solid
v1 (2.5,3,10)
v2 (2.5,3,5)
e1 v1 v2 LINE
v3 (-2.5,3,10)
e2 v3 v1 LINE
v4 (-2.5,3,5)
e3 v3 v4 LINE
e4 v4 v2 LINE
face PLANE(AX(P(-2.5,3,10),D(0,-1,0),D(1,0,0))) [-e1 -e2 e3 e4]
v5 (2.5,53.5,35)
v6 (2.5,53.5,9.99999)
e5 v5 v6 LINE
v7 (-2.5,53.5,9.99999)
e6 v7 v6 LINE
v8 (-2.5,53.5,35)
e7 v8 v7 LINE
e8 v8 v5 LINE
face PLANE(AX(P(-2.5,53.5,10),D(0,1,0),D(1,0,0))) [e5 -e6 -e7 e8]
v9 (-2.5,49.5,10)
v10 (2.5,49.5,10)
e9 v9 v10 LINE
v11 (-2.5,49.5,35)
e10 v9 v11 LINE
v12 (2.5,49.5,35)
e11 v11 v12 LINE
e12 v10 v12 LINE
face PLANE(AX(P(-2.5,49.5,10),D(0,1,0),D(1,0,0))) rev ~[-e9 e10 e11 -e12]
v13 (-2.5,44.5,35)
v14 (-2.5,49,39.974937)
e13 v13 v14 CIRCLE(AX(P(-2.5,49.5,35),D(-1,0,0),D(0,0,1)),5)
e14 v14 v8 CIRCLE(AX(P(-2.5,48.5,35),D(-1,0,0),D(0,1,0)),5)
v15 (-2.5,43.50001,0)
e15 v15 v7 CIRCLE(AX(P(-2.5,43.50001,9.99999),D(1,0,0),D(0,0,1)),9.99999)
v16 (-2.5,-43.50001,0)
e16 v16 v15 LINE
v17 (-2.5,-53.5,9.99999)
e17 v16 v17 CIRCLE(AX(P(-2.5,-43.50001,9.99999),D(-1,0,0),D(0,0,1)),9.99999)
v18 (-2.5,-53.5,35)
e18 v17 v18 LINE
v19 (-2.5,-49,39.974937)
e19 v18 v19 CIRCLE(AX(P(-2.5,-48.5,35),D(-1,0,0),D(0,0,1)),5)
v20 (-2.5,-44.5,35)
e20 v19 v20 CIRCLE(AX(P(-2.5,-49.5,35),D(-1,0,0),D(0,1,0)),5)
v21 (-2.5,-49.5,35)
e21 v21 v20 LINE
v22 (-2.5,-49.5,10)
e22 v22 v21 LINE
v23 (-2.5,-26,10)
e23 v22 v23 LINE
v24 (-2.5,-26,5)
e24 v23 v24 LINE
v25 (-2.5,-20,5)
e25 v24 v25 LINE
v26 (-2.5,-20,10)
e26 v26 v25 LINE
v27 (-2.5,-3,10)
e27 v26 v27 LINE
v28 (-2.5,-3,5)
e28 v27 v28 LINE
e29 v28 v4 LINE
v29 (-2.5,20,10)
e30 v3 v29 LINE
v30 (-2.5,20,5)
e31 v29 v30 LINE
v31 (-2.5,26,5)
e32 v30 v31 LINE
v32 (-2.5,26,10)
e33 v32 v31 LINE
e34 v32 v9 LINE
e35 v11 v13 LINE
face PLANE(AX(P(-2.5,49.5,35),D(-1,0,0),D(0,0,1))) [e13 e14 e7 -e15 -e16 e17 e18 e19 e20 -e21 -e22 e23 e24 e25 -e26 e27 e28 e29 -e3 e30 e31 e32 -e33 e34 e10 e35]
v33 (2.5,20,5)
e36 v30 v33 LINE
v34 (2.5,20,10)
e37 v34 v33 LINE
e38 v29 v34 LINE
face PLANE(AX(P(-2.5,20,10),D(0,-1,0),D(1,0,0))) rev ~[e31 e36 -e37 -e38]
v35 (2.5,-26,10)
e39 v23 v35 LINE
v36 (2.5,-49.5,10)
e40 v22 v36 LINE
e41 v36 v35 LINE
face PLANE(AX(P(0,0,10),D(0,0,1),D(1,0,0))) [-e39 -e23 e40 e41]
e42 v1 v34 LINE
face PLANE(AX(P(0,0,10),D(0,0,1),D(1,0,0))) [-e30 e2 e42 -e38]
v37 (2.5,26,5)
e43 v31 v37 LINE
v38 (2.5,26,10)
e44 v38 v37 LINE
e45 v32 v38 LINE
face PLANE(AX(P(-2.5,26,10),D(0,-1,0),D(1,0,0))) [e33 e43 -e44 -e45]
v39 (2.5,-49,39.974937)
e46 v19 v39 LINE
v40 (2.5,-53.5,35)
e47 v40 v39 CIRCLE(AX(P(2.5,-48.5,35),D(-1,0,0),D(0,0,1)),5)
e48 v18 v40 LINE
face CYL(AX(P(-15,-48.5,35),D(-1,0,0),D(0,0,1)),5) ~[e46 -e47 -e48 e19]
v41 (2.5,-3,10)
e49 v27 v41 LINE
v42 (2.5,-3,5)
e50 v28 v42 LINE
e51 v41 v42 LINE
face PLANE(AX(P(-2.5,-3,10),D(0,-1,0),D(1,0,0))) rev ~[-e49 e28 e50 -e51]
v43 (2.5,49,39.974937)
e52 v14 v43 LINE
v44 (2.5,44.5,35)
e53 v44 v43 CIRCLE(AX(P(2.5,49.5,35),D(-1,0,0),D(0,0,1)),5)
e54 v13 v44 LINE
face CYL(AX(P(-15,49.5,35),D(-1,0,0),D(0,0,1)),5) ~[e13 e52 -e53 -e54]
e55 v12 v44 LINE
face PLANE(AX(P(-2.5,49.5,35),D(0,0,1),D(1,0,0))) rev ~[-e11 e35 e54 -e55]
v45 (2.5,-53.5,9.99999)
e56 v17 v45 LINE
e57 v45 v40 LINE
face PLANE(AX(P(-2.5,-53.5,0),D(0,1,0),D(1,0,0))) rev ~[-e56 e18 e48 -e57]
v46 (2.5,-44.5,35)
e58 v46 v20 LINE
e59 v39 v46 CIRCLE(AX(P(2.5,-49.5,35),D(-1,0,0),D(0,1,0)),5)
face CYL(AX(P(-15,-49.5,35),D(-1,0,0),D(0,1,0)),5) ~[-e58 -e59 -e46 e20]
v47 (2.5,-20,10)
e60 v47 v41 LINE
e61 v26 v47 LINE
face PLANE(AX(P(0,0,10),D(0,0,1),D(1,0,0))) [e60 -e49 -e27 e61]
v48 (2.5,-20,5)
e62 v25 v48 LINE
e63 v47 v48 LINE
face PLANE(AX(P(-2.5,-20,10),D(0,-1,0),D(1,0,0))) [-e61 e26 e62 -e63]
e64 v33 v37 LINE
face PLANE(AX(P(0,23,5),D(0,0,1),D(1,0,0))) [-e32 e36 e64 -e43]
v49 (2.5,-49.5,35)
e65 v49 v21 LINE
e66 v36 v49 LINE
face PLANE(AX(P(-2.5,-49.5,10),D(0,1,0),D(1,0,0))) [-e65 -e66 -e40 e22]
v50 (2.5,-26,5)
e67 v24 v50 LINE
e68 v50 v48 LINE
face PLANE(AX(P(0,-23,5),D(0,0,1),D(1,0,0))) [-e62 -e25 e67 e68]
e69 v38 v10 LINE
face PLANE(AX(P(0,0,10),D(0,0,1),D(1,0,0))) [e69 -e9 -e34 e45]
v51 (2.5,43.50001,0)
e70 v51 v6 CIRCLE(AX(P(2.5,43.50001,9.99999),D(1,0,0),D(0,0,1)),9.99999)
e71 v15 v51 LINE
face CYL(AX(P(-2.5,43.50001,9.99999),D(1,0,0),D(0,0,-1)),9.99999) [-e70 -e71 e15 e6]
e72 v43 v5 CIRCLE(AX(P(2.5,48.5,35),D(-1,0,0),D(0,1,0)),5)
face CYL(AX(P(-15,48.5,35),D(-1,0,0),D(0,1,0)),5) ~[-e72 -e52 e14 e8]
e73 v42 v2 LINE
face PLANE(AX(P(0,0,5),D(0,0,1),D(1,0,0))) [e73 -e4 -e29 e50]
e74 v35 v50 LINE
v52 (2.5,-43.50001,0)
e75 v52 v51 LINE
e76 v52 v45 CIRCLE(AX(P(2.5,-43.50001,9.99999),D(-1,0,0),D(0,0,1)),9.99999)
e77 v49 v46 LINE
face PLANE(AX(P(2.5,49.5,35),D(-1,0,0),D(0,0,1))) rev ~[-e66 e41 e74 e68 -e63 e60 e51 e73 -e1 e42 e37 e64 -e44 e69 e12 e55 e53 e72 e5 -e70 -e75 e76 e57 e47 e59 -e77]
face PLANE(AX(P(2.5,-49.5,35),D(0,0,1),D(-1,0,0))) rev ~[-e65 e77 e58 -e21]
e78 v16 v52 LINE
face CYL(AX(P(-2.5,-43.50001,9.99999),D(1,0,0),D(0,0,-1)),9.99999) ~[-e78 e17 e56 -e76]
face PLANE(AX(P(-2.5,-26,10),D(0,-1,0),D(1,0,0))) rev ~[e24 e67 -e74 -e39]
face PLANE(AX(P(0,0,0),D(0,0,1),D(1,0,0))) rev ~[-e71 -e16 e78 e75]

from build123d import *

# Parameters (mm, degrees)
F0_W         = 5
F0_H         = 107
F1_DEPTH     = 10
F3_W         = 5
F3_H         = 6
F4_DEPTH     = 5
F5_DEPTH     = 5
F6_R         = 9.99999
F2_W         = 5
F2_H         = 4
F7_DEPTH     = 30
F8_DEPTH     = 30
F9_W         = 5
F9_H         = 5
F10_DEPTH    = 5
F11_W        = 5
F11_H        = 5
F12_DEPTH    = 5
F13_T1_DEPTH = 30
F14_W        = 5
F14_H        = 6
F15_DEPTH    = 5


# Not quite as in the source:
# - a fillet or chamfer that OpenCascade refuses, or shapes differently, is made with other operations: its cross-section is extruded or revolved along the edge and cut away or added
# - a fillet or chamfer is up to 0.001 mm smaller than in the source, because OpenCascade refuses the exact size
# - a feature names something its author has since deleted; it is built from what else it names


with BuildPart() as f1:
    # F0 (on Top) → F1 (new body)
    with BuildSketch(Plane.XY):
        Rectangle(F0_W, F0_H)
    extrude(amount=F1_DEPTH)

    # F3 (on face) → F4 (cut)
    with BuildSketch(Plane.XY.offset(10)):
        with Locations((0, 23)):
            Rectangle(F3_W, F3_H)
    extrude(amount=-F4_DEPTH, mode=Mode.SUBTRACT)

    # F3 (on face) → F5 (cut)
    with BuildSketch(Plane.XY.offset(10)):
        with Locations((0, 23)):
            Rectangle(F3_W, F3_H)
        with Locations((0, -23)):
            Rectangle(F3_W, F3_H)
    extrude(amount=-F5_DEPTH, mode=Mode.SUBTRACT)

    # F6 (radius 10 in the source; OpenCascade refuses exactly that, so slightly less here)
    f6_edges = [f1.edges().sort_by_distance(p)[0] for p in [
        (0, -53.5, 0),
        (0, 53.5, 0),
    ]]
    fillet(f6_edges, radius=F6_R)

    # F2 (on face) → F7 (join)
    with BuildSketch(Plane.XY.offset(10)):
        with Locations((0, 51.5)):
            Rectangle(F2_W, F2_H)
    extrude(amount=F7_DEPTH)

    # F2 (on face) → F8 (join)
    with BuildSketch(Plane.XY.offset(10)):
        with Locations((0, 51.5)):
            Rectangle(F2_W, F2_H)
        with Locations((0, -51.5)):
            Rectangle(F2_W, F2_H)
    extrude(amount=F8_DEPTH)

    # F9 (on face) → F10 (join)
    with BuildSketch(Plane(origin=(0, -49.5, 0), x_dir=(-1, 0, 0), z_dir=(0, 1, 0))):
        with Locations((0, 37.5)):
            Rectangle(F9_W, F9_H)
    extrude(amount=F10_DEPTH)

    # F11 (on face) → F12 (join)
    with BuildSketch(Plane.XZ.offset(-49.5)):
        with Locations((0, 37.5)):
            Rectangle(F11_W, F11_H)
    extrude(amount=F12_DEPTH)

    # F13: fillet of radius 5 on 4 edges, made by hand

    # F13_s2 → F13_t1 (cut)
    with BuildSketch(Plane.YZ.offset(-15)):
        with BuildLine():
            ThreePointArc((-48.5, 40), (-52.0355339059, 38.5355339059), (-53.5, 35))
            Line((-53.5, 35), (-53.5, 40))
            Line((-53.5, 40), (-48.5, 40))
        make_face()
        with BuildLine():
            ThreePointArc((53.5, 35), (52.0355339059, 38.5355339059), (48.5, 40))
            Line((48.5, 40), (53.5, 40))
            Line((53.5, 40), (53.5, 35))
        make_face()
        with BuildLine():
            ThreePointArc((49.5, 40), (45.9644660941, 38.5355339059), (44.5, 35))
            Line((44.5, 35), (44.5, 40))
            Line((44.5, 40), (49.5, 40))
        make_face()
        with BuildLine():
            ThreePointArc((-44.5, 35), (-45.9644660941, 38.5355339059), (-49.5, 40))
            Line((-49.5, 40), (-44.5, 40))
            Line((-44.5, 40), (-44.5, 35))
        make_face()
    extrude(amount=F13_T1_DEPTH, mode=Mode.SUBTRACT)

    # F14 (on face) → F15 (cut)
    with BuildSketch(Plane.XY.offset(10)):
        Rectangle(F14_W, F14_H)
    extrude(amount=-F15_DEPTH, mode=Mode.SUBTRACT)


solid = f1.part
